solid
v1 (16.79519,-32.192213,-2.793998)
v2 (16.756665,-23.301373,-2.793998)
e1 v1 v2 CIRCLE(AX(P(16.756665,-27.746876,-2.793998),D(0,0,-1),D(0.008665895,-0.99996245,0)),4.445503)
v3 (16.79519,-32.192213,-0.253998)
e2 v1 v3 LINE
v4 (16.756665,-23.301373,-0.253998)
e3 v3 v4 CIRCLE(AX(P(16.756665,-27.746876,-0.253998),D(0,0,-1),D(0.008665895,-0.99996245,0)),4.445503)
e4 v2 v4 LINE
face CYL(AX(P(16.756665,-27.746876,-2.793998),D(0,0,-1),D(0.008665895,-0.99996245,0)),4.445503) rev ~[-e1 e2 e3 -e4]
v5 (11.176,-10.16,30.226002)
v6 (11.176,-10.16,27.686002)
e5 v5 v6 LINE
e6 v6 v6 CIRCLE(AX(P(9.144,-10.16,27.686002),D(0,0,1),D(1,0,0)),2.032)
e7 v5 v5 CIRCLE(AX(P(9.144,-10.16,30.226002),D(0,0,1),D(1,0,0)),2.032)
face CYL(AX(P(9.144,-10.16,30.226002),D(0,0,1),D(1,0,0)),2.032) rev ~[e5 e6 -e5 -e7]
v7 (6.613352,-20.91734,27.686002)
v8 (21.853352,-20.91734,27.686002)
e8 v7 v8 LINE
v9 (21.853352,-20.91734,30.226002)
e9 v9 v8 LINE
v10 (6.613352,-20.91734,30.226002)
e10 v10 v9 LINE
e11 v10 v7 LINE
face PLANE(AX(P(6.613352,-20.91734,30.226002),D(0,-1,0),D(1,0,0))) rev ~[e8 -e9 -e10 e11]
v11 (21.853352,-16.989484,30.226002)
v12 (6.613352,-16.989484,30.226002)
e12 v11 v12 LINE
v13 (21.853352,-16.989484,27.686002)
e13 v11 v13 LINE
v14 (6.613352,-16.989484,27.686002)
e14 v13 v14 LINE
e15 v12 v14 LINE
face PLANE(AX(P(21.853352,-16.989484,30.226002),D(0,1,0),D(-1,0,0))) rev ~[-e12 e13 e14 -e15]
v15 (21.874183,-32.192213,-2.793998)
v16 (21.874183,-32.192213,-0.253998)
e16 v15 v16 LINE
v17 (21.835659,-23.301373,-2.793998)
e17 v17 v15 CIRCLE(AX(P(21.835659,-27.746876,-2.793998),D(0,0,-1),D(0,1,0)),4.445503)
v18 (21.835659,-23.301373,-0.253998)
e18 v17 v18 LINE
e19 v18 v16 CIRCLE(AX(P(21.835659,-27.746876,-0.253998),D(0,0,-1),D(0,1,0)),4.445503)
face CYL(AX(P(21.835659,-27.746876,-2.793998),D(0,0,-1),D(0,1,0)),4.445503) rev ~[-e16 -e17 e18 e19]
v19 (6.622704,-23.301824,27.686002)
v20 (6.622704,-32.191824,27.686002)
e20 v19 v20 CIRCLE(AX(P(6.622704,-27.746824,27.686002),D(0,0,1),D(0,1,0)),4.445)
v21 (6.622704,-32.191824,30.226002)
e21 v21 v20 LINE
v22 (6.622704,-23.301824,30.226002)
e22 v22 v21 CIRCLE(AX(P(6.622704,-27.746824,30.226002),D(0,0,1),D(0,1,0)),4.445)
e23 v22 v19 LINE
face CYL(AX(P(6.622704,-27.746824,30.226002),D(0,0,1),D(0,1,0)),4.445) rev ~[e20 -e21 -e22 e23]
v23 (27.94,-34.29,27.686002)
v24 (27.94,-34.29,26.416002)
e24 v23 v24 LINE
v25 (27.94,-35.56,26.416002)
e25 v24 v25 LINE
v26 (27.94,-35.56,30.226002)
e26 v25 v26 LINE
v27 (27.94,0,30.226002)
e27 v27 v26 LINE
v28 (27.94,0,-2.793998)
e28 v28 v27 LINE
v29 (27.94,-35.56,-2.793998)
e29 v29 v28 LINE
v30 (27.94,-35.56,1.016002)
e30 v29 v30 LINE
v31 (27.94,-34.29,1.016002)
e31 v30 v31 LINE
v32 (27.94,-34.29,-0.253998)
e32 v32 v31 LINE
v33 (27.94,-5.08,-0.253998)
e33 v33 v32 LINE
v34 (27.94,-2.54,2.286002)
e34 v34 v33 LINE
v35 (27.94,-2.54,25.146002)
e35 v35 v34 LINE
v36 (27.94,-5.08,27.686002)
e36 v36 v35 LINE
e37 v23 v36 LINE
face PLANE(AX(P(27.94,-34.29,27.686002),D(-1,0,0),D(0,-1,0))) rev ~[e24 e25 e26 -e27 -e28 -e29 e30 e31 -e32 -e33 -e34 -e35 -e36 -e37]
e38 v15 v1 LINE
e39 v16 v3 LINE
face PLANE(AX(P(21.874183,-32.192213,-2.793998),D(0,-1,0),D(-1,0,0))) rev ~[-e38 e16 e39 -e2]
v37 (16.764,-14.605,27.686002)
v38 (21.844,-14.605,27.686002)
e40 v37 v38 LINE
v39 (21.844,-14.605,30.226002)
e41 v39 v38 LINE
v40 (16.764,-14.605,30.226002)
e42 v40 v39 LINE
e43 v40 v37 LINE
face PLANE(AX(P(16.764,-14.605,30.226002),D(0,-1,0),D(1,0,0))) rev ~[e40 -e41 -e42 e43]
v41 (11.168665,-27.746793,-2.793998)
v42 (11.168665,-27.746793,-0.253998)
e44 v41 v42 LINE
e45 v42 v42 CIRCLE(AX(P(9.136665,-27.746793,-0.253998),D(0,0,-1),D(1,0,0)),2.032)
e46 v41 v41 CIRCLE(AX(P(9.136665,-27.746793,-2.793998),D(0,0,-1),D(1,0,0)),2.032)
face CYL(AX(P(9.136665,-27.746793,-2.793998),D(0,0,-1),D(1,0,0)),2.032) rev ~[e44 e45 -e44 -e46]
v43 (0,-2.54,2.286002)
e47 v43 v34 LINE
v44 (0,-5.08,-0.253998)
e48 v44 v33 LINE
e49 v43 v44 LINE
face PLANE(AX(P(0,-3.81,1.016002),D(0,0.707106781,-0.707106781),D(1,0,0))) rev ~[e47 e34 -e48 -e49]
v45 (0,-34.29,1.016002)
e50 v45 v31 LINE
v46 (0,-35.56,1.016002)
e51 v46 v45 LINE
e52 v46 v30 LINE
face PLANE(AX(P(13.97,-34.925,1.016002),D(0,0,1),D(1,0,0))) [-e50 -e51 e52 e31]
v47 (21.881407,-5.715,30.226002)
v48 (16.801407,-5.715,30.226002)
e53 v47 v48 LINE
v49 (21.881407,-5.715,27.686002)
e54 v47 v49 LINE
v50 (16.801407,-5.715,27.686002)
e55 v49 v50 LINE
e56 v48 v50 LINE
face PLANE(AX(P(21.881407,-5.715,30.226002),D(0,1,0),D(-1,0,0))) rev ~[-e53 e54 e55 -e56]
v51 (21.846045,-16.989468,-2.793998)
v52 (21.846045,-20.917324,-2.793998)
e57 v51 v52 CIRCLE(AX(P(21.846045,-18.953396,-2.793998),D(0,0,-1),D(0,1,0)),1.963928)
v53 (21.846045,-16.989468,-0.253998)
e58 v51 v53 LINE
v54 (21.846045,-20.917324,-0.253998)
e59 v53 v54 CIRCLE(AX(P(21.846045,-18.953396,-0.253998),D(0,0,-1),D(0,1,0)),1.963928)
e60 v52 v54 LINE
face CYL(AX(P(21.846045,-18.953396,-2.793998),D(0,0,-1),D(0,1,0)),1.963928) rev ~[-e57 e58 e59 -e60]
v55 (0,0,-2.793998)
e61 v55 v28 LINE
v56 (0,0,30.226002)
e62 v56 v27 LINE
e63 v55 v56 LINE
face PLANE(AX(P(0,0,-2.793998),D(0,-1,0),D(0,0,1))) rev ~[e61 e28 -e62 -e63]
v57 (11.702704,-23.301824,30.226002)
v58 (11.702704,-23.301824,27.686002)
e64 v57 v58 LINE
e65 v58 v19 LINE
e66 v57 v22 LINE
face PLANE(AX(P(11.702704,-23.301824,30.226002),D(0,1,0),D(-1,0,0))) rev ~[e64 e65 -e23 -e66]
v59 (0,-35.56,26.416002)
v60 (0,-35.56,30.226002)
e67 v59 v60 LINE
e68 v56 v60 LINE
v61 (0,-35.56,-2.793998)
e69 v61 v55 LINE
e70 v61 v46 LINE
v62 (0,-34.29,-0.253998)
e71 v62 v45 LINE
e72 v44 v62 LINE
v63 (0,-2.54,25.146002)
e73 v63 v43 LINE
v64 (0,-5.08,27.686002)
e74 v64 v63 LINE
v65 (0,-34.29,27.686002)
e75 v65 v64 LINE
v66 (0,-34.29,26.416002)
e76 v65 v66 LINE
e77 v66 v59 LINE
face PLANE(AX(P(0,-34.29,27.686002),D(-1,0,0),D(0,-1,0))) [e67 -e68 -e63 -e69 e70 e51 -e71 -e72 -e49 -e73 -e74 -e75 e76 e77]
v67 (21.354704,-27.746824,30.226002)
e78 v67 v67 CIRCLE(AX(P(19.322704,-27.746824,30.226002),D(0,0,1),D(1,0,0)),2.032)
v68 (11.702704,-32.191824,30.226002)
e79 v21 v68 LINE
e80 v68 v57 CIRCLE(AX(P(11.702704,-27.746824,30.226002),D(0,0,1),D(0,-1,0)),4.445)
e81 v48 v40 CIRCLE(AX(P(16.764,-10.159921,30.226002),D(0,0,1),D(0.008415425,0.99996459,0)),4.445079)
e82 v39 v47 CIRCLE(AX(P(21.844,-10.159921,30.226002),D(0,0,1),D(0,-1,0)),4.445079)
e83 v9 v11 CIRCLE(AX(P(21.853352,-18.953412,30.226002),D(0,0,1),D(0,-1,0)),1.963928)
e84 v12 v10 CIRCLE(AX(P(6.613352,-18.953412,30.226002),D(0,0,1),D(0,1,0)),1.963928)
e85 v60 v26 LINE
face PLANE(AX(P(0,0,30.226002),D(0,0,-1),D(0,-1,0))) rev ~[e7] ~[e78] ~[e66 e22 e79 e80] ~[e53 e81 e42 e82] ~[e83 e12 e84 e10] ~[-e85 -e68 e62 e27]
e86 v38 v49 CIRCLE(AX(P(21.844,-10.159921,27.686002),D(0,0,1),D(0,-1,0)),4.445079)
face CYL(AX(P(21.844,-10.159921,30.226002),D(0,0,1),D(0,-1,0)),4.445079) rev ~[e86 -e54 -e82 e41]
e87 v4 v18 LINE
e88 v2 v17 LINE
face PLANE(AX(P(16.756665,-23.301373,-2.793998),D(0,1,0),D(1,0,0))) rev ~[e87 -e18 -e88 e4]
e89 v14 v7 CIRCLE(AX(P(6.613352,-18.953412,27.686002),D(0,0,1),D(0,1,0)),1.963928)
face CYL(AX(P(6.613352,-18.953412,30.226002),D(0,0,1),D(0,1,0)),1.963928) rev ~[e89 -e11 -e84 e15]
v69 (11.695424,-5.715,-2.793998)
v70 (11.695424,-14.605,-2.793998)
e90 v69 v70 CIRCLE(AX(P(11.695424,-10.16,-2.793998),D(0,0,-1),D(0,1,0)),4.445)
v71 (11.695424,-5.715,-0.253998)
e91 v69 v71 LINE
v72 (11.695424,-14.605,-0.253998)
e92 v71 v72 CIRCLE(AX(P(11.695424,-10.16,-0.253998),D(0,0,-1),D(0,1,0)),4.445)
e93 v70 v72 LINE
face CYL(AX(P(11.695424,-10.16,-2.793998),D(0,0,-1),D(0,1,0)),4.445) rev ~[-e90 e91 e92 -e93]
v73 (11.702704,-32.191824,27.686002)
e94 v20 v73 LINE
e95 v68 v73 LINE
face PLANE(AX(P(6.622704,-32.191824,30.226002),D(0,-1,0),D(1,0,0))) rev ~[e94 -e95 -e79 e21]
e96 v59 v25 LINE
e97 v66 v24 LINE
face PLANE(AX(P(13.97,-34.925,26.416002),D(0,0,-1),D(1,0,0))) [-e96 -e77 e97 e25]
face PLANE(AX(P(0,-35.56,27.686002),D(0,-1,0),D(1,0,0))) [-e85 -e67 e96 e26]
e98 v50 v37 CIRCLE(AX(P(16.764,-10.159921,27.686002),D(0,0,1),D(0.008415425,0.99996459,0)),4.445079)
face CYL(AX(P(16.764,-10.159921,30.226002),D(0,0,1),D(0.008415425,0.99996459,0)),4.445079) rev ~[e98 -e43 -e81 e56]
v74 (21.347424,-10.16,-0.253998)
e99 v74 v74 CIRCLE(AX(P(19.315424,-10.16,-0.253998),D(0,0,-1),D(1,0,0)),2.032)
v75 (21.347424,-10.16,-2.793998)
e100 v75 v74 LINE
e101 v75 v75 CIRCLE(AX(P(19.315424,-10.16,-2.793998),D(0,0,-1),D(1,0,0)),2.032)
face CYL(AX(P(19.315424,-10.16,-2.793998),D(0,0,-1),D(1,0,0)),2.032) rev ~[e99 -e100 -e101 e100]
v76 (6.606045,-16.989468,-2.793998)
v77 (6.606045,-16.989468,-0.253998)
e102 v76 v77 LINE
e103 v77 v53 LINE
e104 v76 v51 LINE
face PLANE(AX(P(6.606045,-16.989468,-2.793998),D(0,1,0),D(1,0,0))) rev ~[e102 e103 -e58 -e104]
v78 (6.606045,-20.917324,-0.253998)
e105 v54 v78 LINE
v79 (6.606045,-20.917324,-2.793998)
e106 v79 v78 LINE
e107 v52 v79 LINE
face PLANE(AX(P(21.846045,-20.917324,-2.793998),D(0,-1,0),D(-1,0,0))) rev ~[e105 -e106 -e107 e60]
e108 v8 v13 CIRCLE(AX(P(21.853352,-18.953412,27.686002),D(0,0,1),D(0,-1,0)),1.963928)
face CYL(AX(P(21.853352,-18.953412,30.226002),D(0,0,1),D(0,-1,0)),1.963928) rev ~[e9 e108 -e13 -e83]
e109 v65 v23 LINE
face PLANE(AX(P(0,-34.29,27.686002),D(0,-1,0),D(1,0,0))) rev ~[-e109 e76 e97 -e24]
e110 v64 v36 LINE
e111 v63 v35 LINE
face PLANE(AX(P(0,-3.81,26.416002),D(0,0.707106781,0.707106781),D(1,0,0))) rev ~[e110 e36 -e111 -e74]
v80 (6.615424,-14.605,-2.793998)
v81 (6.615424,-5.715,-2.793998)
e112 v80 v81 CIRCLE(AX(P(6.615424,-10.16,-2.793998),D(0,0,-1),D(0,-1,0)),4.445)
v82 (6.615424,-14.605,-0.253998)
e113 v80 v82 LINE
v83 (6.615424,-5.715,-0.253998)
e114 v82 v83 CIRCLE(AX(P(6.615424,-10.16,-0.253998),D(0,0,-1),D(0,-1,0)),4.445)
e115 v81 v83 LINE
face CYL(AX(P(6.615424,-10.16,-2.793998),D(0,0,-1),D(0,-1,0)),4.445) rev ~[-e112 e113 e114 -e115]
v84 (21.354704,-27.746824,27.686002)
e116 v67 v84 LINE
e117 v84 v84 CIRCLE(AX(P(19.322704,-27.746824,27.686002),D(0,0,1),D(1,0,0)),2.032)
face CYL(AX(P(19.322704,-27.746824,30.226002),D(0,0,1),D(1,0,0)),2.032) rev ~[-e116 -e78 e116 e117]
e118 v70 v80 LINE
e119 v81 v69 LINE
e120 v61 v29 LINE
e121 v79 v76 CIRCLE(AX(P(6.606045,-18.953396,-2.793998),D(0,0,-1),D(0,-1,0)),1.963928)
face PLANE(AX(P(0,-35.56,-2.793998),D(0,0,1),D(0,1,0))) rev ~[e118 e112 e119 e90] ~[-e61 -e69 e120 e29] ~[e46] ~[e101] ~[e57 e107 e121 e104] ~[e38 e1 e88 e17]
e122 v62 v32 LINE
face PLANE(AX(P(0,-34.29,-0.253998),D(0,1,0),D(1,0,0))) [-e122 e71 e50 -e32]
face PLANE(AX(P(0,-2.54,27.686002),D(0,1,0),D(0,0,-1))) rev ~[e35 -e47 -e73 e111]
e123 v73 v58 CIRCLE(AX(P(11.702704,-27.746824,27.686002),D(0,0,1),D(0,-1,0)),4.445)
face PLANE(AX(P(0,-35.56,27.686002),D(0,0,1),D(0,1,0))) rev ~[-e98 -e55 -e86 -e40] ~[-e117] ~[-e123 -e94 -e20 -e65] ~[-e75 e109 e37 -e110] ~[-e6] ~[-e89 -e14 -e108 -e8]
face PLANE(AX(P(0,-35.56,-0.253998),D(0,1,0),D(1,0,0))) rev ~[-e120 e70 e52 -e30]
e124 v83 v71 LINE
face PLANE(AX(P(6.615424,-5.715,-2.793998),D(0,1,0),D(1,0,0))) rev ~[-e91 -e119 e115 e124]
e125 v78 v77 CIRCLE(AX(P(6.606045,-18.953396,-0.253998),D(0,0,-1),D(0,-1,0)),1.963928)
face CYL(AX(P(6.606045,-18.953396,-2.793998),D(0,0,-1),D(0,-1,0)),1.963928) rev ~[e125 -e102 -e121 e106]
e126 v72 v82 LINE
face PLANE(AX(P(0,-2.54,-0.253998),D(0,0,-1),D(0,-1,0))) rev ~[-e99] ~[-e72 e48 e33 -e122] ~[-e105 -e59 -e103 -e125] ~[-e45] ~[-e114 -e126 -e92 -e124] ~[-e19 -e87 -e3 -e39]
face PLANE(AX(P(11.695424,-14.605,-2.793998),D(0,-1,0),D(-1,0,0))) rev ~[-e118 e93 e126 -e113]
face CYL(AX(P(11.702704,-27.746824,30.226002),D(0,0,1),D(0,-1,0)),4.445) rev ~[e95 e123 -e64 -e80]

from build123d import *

# Parameters (mm, degrees)
F1_DEPTH  = 27.94
F2_R      = 2.032
F3_DEPTH  = 2.54
F4_R      = 2.032
F5_DEPTH  = 2.54
F6_SIZE   = 2.54
F7_W      = 27.94
F7_H      = 1.27
F8_DEPTH  = 1.27
F9_W      = 27.94
F9_H      = 1.27
F10_DEPTH = 1.27


with BuildPart() as f1:
    # F0 (on Right) → F1 (new body)
    with BuildSketch(Plane.YZ):
        Polygon((0, 30.226001516), (-35.56, 30.226001516), (-35.56, 27.686001516), (-2.54, 27.686001516), (-2.54, -0.253998484), (-35.56, -0.253998484), (-35.56, -2.793998484), (0, -2.793998484), align=None)
    extrude(amount=F1_DEPTH)

    # F2 (on face) → F3 (cut, through all)
    with BuildSketch(Plane.XY.offset(30.226001516)):
        with Locations((9.144, -10.16)):
            Circle(F2_R)
        with Locations((19.3227036137, -27.7468244076)):
            Circle(F2_R)
        with BuildLine():
            Line((21.8533518069, -16.9894844152), (6.6133518069, -16.9894844152))
            ThreePointArc((6.6133518069, -16.9894844152), (4.6494240183, -18.9534122038), (6.6133518069, -20.9173399924))
            Line((6.6133518069, -20.9173399924), (21.8533518069, -20.9173399924))
            ThreePointArc((21.8533518069, -20.9173399924), (23.8172795954, -18.9534122038), (21.8533518069, -16.9894844152))
        make_face()
        with BuildLine():
            ThreePointArc((21.8439999996, -14.605), (26.2890393498, -10.1786250789), (21.8814072278, -5.715))
            Line((21.8814072278, -5.715), (16.8014072278, -5.715))
            ThreePointArc((16.8014072278, -5.715), (12.3189606494, -10.1412175195), (16.7639999996, -14.605))
            Line((16.7639999996, -14.605), (21.8439999996, -14.605))
        make_face()
        with BuildLine():
            ThreePointArc((11.7027036137, -32.1918244076), (16.1477036137, -27.7468244076), (11.7027036137, -23.3018244076))
            Line((11.7027036137, -23.3018244076), (6.6227036137, -23.3018244076))
            ThreePointArc((6.6227036137, -23.3018244076), (2.1777036137, -27.7468244076), (6.6227036137, -32.1918244076))
            Line((6.6227036137, -32.1918244076), (11.7027036137, -32.1918244076))
        make_face()
    extrude(amount=-F3_DEPTH, mode=Mode.SUBTRACT)

    # F4 (on face) → F5 (cut, through all)
    with BuildSketch(Plane(origin=(0, 0, -2.793998484), x_dir=(1, 0, 0), z_dir=(0, 0, -1))):
        with Locations((9.1366654938, 27.746792541)):
            Circle(F4_R)
        with Locations((19.3154241667, 10.16)):
            Circle(F4_R)
        with BuildLine():
            Line((21.8460448303, 20.9173240591), (6.6060448303, 20.9173240591))
            ThreePointArc((6.6060448303, 20.9173240591), (4.6421170417, 18.9533962705), (6.6060448303, 16.9894684819))
            Line((6.6060448303, 16.9894684819), (21.8460448303, 16.9894684819))
            ThreePointArc((21.8460448303, 16.9894684819), (23.8099726188, 18.9533962705), (21.8460448303, 20.9173240591))
        make_face()
        with BuildLine():
            ThreePointArc((21.8356585741, 23.3013725448), (26.2811203019, 27.7276136907), (21.8741828399, 32.1922125373))
            Line((21.8741828399, 32.1922125373), (16.7951897592, 32.1922125373))
            ThreePointArc((16.7951897592, 32.1922125373), (12.3112037656, 27.7661383181), (16.7566654934, 23.3013725448))
            Line((16.7566654934, 23.3013725448), (21.8356585741, 23.3013725448))
        make_face()
        with BuildLine():
            ThreePointArc((11.6954241667, 5.715), (16.1404241667, 10.16), (11.6954241667, 14.605))
            Line((11.6954241667, 14.605), (6.6154241667, 14.605))
            ThreePointArc((6.6154241667, 14.605), (2.1704241667, 10.16), (6.6154241667, 5.715))
            Line((6.6154241667, 5.715), (11.6954241667, 5.715))
        make_face()
    extrude(amount=-F5_DEPTH, mode=Mode.SUBTRACT)

    # F6
    f6_edges = [f1.edges().sort_by_distance(p)[0] for p in [
        (13.97, -2.54, -0.253998),
        (13.97, -2.54, 27.686002),
    ]]
    chamfer(f6_edges, length=F6_SIZE)

    # F7 (on face) → F8 (join)
    with BuildSketch(Plane.XY.offset(-0.253998484)):
        with Locations((13.97, -34.925)):
            Rectangle(F7_W, F7_H)
    extrude(amount=F8_DEPTH)

    # F9 (on face) → F10 (join)
    with BuildSketch(Plane(origin=(0, 0, 27.686001516), x_dir=(1, 0, 0), z_dir=(0, 0, -1))):
        with Locations((13.97, 34.925)):
            Rectangle(F9_W, F9_H)
    extrude(amount=F10_DEPTH)


solid = f1.part
